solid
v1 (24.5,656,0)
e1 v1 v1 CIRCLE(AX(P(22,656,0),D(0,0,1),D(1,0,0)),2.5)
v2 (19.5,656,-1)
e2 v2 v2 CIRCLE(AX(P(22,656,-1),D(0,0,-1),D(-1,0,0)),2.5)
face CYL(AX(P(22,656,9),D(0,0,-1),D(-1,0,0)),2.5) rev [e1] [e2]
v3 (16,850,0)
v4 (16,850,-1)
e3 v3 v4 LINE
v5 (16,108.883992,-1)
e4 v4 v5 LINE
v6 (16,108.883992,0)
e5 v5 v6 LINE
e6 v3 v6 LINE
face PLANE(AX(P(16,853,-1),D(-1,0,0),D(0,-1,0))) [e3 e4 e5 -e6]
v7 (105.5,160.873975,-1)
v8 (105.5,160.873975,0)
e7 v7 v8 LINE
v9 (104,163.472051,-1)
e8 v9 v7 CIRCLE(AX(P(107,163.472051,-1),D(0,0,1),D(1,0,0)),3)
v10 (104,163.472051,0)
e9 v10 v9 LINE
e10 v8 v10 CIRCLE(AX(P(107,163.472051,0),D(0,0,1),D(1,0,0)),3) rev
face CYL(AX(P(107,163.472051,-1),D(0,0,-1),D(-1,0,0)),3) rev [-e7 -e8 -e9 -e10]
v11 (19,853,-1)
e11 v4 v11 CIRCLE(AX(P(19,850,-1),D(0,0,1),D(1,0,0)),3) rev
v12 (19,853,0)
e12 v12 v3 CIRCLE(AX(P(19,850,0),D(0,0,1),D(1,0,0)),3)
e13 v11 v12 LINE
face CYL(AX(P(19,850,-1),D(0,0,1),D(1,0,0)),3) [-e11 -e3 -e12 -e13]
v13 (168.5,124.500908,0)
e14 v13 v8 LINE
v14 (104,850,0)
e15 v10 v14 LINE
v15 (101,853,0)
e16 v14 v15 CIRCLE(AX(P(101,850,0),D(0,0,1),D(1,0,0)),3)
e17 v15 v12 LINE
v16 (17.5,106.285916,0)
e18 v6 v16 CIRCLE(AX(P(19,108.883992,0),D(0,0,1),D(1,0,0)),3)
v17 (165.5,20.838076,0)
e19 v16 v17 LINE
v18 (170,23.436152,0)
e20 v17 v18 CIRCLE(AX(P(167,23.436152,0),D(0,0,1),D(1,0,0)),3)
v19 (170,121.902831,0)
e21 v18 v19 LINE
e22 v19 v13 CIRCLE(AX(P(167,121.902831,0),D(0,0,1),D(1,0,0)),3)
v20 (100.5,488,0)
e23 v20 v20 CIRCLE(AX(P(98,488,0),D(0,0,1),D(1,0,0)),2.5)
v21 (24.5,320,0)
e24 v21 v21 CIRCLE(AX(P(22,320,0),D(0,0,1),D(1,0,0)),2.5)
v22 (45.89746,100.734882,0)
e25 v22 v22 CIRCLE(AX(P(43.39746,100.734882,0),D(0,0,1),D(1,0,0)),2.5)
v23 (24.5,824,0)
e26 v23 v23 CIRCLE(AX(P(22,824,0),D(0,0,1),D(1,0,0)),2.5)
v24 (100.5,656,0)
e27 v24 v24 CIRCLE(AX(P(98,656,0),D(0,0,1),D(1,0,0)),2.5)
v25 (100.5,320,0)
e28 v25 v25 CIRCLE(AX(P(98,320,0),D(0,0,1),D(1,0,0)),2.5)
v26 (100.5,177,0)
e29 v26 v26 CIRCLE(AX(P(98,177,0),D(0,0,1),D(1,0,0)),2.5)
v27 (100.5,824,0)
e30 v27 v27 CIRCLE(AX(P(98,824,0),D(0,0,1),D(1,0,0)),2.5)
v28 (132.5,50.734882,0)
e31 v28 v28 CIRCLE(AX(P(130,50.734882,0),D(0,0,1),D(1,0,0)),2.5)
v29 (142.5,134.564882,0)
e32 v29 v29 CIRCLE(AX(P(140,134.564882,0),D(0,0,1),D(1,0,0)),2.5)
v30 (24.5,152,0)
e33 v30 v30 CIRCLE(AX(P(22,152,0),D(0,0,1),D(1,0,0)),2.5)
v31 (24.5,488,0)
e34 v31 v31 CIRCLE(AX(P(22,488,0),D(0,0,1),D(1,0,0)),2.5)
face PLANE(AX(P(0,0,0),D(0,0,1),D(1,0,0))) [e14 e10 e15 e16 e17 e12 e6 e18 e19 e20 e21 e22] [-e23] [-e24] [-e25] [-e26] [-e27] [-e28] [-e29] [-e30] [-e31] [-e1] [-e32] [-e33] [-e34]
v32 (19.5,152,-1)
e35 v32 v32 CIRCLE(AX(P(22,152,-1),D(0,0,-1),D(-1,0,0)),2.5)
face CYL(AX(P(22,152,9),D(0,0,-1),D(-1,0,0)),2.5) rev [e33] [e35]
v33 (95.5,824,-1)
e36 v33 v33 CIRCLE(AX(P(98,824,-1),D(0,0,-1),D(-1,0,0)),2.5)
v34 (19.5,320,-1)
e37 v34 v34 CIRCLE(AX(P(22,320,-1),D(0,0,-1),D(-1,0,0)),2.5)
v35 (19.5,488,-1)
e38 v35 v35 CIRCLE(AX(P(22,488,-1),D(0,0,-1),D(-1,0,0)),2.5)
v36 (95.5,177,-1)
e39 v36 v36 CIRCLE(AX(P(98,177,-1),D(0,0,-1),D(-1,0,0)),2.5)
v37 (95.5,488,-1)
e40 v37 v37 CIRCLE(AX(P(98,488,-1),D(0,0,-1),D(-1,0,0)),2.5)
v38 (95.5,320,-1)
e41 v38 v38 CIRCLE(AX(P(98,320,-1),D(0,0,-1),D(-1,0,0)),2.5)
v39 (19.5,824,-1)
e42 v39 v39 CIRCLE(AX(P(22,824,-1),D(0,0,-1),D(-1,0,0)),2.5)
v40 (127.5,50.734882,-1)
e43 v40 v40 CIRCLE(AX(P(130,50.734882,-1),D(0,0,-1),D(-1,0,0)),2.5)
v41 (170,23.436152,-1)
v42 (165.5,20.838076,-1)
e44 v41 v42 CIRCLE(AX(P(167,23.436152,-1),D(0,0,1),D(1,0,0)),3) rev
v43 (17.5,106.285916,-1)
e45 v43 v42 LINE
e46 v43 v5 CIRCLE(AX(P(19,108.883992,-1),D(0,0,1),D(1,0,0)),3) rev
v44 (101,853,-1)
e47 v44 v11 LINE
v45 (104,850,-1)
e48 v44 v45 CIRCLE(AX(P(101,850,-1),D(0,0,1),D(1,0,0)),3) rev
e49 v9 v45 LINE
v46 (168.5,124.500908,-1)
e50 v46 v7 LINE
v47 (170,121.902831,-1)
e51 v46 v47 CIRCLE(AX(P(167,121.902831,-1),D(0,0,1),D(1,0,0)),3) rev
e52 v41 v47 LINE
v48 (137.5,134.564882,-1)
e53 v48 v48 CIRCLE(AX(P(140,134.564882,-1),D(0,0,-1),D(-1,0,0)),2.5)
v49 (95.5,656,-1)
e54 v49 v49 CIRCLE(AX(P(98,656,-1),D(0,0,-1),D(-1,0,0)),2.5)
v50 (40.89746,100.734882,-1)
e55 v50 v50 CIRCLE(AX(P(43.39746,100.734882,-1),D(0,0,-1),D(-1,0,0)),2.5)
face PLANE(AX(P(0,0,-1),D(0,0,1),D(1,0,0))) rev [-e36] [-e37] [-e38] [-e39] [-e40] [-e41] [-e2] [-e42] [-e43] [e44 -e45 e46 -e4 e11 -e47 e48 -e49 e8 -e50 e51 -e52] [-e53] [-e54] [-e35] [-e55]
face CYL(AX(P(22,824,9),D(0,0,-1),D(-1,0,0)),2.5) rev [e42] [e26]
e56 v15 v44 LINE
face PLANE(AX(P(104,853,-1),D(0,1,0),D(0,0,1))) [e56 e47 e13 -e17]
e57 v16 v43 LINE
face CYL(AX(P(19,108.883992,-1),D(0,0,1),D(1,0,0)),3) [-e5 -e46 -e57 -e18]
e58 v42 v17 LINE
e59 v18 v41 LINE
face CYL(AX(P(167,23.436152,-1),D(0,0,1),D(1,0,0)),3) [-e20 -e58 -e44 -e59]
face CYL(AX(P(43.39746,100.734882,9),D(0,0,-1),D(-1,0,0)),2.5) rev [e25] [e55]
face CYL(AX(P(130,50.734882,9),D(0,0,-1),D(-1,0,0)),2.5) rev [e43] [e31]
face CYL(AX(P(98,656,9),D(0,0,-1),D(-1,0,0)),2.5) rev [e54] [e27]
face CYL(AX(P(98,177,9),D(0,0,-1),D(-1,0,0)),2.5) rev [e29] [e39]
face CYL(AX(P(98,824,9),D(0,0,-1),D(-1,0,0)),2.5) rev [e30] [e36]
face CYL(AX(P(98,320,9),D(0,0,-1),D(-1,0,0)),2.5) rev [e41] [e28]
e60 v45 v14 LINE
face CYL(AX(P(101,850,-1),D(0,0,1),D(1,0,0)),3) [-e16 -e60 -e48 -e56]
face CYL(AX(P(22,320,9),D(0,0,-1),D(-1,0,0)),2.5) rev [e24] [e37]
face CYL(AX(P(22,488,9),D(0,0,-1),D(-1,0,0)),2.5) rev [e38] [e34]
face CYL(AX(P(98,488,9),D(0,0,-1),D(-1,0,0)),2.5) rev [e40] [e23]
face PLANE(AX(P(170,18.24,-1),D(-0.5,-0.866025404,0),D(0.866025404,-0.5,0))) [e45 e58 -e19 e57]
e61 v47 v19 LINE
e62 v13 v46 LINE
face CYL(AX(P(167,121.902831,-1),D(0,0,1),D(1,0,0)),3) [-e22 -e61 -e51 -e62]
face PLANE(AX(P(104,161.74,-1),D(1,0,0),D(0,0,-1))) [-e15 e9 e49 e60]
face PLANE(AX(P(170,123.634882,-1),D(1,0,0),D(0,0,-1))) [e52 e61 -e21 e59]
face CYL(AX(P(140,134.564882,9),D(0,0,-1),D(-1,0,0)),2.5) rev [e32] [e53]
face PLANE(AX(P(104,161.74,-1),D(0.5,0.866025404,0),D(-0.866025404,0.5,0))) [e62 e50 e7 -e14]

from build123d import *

# Parameters (mm, degrees)
BASE_FLANGE1_DEPTH = 1
SKETCH2_R          = 2.5
CUT_EXTRUDE1_DEPTH = 10
FILLET1_R          = 3


# Sheet-metal steps are written as plain solids
with BuildPart() as part:
    # Sketch1 → Base-Flange1 (new body)
    with BuildSketch(Plane.XY):
        Polygon((104, 853), (16, 853), (16, 107.151941455), (170, 18.24), (170, 123.634882233), (104, 161.74), align=None)
    extrude(amount=-BASE_FLANGE1_DEPTH)

    # Sketch2 → Cut-Extrude1 (cut)
    with BuildSketch(Plane(origin=(0, 0, -1), x_dir=(-1, 0, 0), z_dir=(0, 0, -1))):
        with Locations((-22, 824)):
            Circle(SKETCH2_R)
        with Locations((-98, 824)):
            Circle(SKETCH2_R)
        with Locations((-98, 656)):
            Circle(SKETCH2_R)
        with Locations((-98, 488)):
            Circle(SKETCH2_R)
        with Locations((-98, 320)):
            Circle(SKETCH2_R)
        with Locations((-22, 656)):
            Circle(SKETCH2_R)
        with Locations((-22, 488)):
            Circle(SKETCH2_R)
        with Locations((-22, 320)):
            Circle(SKETCH2_R)
        with Locations((-22, 152)):
            Circle(SKETCH2_R)
        with Locations((-98, 177)):
            Circle(SKETCH2_R)
        with Locations((-140, 134.564882233)):
            Circle(SKETCH2_R)
        with Locations((-130, 50.734882233)):
            Circle(SKETCH2_R)
        with Locations((-43.397459622, 100.734882233)):
            Circle(SKETCH2_R)
    extrude(amount=-CUT_EXTRUDE1_DEPTH, mode=Mode.SUBTRACT)

    # Fillet1
    fillet1_edges = [part.edges().sort_by_distance(p)[0] for p in [
        (104, 161.74, -0.5),
        (170, 123.634882233, -0.5),
        (170, 18.24, -0.5),
        (16, 107.151941455, -0.5),
        (16, 853, -0.5),
        (104, 853, -0.5),
    ]]
    fillet(fillet1_edges, radius=FILLET1_R)


solid = part.part
